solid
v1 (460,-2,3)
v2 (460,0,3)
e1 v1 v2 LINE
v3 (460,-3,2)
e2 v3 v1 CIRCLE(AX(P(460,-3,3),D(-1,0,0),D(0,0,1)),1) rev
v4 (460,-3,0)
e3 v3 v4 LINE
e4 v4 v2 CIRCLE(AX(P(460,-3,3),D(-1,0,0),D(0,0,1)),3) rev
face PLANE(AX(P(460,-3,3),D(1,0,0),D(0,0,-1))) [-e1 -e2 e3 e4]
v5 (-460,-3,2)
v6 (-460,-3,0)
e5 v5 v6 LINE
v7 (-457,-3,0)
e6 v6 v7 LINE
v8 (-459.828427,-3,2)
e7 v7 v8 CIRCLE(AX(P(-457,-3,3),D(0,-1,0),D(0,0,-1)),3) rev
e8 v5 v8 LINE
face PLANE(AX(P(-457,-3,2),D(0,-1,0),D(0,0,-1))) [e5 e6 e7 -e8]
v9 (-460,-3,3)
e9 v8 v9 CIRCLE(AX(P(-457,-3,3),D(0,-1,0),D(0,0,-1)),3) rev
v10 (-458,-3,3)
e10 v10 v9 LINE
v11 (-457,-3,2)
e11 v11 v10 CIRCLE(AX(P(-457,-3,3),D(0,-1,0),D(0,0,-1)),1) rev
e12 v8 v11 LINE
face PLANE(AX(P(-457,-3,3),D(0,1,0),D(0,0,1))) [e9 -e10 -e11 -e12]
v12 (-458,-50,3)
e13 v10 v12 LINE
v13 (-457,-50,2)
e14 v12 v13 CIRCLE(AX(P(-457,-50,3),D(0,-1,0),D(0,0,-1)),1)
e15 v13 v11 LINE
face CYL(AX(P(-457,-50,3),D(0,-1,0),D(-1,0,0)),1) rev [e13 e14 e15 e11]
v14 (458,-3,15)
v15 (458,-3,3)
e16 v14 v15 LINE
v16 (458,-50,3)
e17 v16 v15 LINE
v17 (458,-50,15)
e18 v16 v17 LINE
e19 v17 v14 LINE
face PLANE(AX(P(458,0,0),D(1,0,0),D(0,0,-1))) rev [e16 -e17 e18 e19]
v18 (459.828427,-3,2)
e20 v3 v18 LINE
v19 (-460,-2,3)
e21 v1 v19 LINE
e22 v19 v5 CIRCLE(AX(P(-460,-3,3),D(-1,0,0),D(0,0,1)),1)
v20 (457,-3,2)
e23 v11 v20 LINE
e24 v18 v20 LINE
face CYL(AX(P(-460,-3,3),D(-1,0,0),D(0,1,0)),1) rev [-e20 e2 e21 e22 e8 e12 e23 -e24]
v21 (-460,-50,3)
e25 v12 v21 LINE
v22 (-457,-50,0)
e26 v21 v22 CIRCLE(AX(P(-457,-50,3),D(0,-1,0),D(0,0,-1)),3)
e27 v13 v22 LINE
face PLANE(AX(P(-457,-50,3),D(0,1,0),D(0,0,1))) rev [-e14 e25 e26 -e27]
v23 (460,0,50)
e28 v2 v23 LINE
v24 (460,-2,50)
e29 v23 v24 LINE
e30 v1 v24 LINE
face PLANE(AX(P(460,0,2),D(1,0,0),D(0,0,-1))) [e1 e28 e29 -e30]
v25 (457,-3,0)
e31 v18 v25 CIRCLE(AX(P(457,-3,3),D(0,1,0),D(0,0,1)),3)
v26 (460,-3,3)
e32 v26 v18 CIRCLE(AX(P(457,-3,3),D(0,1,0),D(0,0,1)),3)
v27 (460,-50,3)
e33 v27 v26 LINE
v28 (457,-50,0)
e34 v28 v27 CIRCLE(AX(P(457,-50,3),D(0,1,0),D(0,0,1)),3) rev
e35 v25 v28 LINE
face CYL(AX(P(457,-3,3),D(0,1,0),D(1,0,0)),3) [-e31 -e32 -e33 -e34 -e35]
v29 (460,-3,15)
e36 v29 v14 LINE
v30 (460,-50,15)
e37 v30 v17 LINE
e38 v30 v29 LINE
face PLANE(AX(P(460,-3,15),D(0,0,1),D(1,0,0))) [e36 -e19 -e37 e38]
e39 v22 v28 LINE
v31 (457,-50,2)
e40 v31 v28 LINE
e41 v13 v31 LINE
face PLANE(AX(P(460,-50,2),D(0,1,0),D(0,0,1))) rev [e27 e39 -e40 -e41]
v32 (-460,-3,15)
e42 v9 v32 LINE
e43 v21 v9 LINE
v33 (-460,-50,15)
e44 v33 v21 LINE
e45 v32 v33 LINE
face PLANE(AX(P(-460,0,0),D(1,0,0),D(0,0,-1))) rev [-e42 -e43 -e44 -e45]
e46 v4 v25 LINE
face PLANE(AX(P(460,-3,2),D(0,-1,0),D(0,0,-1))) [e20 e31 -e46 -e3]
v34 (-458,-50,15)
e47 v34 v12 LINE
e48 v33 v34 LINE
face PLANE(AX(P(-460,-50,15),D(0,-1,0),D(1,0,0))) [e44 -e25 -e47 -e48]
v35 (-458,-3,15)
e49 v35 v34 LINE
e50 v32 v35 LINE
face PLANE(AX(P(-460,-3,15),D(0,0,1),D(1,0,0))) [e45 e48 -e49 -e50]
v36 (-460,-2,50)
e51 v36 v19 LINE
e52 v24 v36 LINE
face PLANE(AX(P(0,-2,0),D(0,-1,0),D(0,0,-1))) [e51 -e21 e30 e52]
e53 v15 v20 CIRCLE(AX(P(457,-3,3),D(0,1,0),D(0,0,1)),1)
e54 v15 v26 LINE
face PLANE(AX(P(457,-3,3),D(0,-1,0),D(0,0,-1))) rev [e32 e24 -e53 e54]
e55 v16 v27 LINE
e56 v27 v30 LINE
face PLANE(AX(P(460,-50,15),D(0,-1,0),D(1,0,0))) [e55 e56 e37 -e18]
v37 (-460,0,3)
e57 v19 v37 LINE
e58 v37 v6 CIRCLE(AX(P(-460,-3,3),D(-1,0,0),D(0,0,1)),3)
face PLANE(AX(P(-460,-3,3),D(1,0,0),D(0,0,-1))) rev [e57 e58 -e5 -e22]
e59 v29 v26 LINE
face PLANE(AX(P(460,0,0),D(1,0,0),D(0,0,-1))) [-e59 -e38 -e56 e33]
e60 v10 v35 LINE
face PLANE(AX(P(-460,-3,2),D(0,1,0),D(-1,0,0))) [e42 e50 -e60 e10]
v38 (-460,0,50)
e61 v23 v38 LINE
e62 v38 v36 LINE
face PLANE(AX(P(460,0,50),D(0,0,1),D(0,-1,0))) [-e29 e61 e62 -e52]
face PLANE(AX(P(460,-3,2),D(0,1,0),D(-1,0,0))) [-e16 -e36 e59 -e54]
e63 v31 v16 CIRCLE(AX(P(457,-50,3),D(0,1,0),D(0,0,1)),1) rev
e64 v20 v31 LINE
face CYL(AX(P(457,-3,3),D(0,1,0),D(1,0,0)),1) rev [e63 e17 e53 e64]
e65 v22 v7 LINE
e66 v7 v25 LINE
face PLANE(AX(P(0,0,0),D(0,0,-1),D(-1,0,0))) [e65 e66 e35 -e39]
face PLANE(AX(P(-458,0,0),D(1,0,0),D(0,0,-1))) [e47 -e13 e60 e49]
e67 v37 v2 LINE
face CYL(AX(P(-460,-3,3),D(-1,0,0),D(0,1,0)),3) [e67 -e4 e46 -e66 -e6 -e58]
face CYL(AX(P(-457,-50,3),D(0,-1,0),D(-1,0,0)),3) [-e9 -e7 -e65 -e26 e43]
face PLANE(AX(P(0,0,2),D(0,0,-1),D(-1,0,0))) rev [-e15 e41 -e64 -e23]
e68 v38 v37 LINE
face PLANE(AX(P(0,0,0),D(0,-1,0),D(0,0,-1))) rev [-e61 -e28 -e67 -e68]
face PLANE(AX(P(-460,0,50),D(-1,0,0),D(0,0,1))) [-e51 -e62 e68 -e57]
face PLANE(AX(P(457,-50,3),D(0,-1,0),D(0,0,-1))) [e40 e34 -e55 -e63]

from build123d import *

# Parameters (mm, degrees)
BASEFLANGE_W                   = 920
BASEFLANGE_H                   = 50
BASE_FLANGE1_DEPTH             = 2
EDGE_FLANGE1_STRIP_W           = 10
EDGE_FLANGE1_STRIP_H           = 2
EDGE_FLANGE1_STRIP_CUT_DEPTH   = 920
EDGE_FLANGE1_DEPTH             = 920
EDGE_FLANGE2_STRIP_W           = 10
EDGE_FLANGE2_STRIP_H           = 2
EDGE_FLANGE2_STRIP_CUT_DEPTH   = 47
EDGE_FLANGE2_STRIP_2_W         = 10
EDGE_FLANGE2_STRIP_2_H         = 2
EDGE_FLANGE2_STRIP_CUT_2_DEPTH = 47
EDGE_FLANGE2_DEPTH             = 47
EDGE_FLANGE2_BEND_DEPTH        = 47


# Sheet-metal steps are written as plain solids
with BuildPart() as part:
    # BaseFlange → Base-Flange1 (new body)
    with BuildSketch(Plane.XY):
        with Locations((0, -25)):
            Rectangle(BASEFLANGE_W, BASEFLANGE_H)
    extrude(amount=BASE_FLANGE1_DEPTH)

    # Edge-Flange1 strip (across the edge) → Edge-Flange1 strip cut (cut)
    with BuildSketch(Plane(origin=(460, 0, 2), x_dir=(0, -1, 0), z_dir=(-1, 0, 0))):
        with Locations((-2, -1)):
            Rectangle(EDGE_FLANGE1_STRIP_W, EDGE_FLANGE1_STRIP_H)
    extrude(amount=EDGE_FLANGE1_STRIP_CUT_DEPTH, mode=Mode.SUBTRACT)

    # Edge-Flange1 section (across the edge) → Edge-Flange1 (add)
    with BuildSketch(Plane(origin=(460, 0, 2), x_dir=(0, -1, 0), z_dir=(-1, 0, 0))):
        with BuildLine():
            Line((0, 1), (0, 48))
            Line((0, 48), (2, 48))
            Line((2, 48), (2, 1))
            ThreePointArc((2, 1), (2.292893219, 0.292893219), (3, 0))
            Line((3, 0), (3, -2))
            ThreePointArc((3, -2), (0.878679656, -1.121320344), (0, 1))
        make_face()
    extrude(amount=EDGE_FLANGE1_DEPTH)

    # Edge-Flange2 strip (across the edge) → Edge-Flange2 strip cut (cut)
    with BuildSketch(Plane(origin=(460, -50, 2), x_dir=(-1, 0, 0), z_dir=(0, 1, 0))):
        with Locations((-2, -1)):
            Rectangle(EDGE_FLANGE2_STRIP_W, EDGE_FLANGE2_STRIP_H)
    extrude(amount=EDGE_FLANGE2_STRIP_CUT_DEPTH, mode=Mode.SUBTRACT)

    # Edge-Flange2 strip 2 (across the edge) → Edge-Flange2 strip cut 2 (cut)
    with BuildSketch(Plane(origin=(-460, -3, 2), x_dir=(1, 0, 0), z_dir=(0, -1, 0))):
        with Locations((-2, -1)):
            Rectangle(EDGE_FLANGE2_STRIP_2_W, EDGE_FLANGE2_STRIP_2_H)
    extrude(amount=EDGE_FLANGE2_STRIP_CUT_2_DEPTH, mode=Mode.SUBTRACT)

    # Edge-Flange2 section (across the edge) → Edge-Flange2 (add)
    with BuildSketch(Plane(origin=(460, -50, 2), x_dir=(-1, 0, 0), z_dir=(0, 1, 0))):
        with BuildLine():
            Line((0, 1), (0, 13))
            Line((0, 13), (2, 13))
            Line((2, 13), (2, 1))
            ThreePointArc((2, 1), (2.292893219, 0.292893219), (3, 0))
            Line((3, 0), (3, -2))
            ThreePointArc((3, -2), (0.878679656, -1.121320344), (0, 1))
        make_face()
    extrude(amount=EDGE_FLANGE2_DEPTH)

    # Edge-Flange2 section 2 (across the edge) → Edge-Flange2 bend (add)
    with BuildSketch(Plane(origin=(-460, -3, 2), x_dir=(1, 0, 0), z_dir=(0, -1, 0))):
        with BuildLine():
            Line((0, 1), (0, 13))
            Line((0, 13), (2, 13))
            Line((2, 13), (2, 1))
            ThreePointArc((2, 1), (2.292893219, 0.292893219), (3, 0))
            Line((3, 0), (3, -2))
            ThreePointArc((3, -2), (0.878679656, -1.121320344), (0, 1))
        make_face()
    extrude(amount=EDGE_FLANGE2_BEND_DEPTH)


solid = part.part
